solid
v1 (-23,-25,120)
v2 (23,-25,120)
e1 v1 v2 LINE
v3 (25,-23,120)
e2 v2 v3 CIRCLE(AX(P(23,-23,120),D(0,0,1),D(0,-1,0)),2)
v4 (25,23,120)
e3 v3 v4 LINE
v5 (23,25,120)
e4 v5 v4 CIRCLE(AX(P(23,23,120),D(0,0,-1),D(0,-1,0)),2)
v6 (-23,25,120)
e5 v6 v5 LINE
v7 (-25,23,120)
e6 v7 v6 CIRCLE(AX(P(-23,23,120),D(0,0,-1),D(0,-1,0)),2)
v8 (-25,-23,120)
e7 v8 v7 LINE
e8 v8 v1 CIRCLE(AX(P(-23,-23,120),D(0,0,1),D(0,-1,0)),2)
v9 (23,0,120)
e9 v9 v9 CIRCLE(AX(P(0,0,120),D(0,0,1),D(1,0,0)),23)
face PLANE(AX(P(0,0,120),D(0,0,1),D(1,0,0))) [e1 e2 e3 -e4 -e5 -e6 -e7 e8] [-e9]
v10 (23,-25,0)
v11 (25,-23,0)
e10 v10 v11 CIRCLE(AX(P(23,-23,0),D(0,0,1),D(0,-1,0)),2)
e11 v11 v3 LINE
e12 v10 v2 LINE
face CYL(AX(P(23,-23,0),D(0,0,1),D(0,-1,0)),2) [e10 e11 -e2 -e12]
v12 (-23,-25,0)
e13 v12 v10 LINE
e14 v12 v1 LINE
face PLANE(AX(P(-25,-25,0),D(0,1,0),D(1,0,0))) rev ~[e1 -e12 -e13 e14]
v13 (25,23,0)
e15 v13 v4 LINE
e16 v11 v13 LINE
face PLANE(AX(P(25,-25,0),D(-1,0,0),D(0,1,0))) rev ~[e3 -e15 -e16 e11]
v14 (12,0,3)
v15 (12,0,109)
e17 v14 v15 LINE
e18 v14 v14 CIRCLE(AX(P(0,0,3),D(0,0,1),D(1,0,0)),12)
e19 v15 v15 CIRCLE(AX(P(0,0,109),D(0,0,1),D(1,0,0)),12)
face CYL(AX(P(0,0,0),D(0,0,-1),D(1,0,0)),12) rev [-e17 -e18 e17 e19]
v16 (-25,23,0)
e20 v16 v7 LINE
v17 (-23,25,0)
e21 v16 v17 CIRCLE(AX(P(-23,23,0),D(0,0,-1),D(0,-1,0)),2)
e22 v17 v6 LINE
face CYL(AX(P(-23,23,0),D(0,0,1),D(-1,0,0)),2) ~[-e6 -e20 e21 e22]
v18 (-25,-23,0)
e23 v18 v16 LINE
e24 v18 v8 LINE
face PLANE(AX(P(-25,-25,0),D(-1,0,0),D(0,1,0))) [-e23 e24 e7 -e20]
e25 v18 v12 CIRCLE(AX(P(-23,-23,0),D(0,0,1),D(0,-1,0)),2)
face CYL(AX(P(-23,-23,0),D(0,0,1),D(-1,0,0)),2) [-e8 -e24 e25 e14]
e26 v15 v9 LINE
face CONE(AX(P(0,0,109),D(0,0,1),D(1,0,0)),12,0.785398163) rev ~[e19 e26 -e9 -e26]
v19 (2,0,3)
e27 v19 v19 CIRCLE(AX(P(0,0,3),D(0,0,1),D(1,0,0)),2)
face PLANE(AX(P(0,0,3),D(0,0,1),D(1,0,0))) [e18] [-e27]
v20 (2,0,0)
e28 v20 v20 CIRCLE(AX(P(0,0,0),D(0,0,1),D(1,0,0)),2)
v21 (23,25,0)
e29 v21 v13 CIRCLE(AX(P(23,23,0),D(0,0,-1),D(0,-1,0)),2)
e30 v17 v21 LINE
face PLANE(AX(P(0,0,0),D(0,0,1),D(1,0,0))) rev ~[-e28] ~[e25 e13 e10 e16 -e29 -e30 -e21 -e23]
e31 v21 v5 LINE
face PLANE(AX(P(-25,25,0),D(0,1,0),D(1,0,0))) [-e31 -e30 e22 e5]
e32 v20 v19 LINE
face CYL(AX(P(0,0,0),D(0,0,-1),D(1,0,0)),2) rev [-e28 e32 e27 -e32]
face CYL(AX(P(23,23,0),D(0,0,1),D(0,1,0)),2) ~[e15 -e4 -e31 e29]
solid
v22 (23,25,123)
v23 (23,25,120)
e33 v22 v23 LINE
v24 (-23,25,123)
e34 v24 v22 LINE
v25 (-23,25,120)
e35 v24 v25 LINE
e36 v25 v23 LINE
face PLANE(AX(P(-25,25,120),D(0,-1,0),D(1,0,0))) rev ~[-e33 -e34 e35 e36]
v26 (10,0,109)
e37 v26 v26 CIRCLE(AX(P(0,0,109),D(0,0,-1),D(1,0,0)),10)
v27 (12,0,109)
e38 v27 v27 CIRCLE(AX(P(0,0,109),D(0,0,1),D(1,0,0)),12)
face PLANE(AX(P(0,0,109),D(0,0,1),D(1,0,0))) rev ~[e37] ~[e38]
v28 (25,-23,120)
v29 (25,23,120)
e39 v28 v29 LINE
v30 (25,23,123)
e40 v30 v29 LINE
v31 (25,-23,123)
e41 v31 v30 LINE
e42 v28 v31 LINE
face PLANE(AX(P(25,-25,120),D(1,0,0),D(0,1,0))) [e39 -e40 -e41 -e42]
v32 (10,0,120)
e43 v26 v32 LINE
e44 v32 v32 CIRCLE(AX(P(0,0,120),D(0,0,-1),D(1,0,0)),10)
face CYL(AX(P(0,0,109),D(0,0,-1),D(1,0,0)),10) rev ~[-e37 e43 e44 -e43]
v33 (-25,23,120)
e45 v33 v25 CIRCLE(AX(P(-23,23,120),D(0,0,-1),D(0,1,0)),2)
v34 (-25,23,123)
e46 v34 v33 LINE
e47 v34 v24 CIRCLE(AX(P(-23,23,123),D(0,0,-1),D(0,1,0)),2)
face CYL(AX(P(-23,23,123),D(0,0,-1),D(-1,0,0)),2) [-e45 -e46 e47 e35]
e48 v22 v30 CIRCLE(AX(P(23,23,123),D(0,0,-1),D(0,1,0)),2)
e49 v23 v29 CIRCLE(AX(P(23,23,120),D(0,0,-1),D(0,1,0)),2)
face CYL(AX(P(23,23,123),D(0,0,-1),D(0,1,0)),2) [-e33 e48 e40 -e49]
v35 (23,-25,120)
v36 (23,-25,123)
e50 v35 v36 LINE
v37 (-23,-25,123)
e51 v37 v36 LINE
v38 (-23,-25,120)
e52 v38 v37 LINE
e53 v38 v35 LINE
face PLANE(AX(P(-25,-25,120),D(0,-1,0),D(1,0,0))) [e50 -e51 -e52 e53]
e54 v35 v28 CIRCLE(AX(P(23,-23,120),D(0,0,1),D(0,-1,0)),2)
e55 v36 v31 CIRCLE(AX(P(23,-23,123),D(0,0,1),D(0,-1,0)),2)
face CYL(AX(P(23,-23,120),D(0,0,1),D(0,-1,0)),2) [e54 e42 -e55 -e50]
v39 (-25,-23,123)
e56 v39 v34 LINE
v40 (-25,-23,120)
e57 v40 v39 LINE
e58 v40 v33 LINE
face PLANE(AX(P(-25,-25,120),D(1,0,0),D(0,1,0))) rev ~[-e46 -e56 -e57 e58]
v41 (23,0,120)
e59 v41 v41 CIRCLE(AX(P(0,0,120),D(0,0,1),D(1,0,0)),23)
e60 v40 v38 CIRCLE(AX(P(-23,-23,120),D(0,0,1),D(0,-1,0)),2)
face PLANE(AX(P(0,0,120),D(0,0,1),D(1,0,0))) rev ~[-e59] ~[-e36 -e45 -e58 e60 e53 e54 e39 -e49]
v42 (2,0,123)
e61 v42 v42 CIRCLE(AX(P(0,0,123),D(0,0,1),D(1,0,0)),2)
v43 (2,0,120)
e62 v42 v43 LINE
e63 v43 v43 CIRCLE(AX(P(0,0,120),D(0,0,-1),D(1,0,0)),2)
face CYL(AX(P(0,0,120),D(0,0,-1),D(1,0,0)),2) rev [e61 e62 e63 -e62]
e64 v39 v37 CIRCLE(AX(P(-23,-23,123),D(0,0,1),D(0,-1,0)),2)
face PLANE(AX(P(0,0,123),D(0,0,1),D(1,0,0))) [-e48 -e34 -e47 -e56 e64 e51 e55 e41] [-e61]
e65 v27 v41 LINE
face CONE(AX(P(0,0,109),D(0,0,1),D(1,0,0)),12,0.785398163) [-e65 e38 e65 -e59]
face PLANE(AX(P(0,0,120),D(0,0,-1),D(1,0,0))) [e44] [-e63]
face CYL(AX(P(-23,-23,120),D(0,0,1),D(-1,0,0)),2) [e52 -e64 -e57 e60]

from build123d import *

# Parameters (mm, degrees)
F0_W          = 50
F0_H          = 50
F0_R          = 12
F1_DEPTH      = 120
F0_R_2        = 2
F2_DEPTH      = 3
F3_SIZE       = 11
F4_W          = 50
F4_H          = 50
F4_R          = 2
F5_DEPTH      = 3
F5_DEPTH_BACK = 11
F7_R          = 10
F8_DEPTH      = 11
F9_R          = 2
F9_2_R        = 2


# Not quite as in the source:
# - a feature names something its author has since deleted; it is built from what else it names


with BuildPart() as f1:
    # F0 (on Top) → F1 (new body)
    with BuildSketch(Plane.XY):
        Rectangle(F0_W, F0_H)
        Circle(F0_R, mode=Mode.SUBTRACT)
    extrude(amount=F1_DEPTH)

    # F0 (on Top) → F2 (join)
    with BuildSketch(Plane.XY):
        Circle(F0_R)
        Circle(F0_R_2, mode=Mode.SUBTRACT)
    extrude(amount=F2_DEPTH)

    # F3
    f3_edges = [f1.edges().sort_by_distance(p)[0] for p in [
        (-12, 0, 120),
    ]]
    chamfer(f3_edges, length=F3_SIZE)


with BuildPart() as f5:
    # F4 (on face) → F5 (new body, two sides)
    with BuildSketch(Plane.XY.offset(120)) as f5_sk:
        Rectangle(F4_W, F4_H)
        Circle(F4_R, mode=Mode.SUBTRACT)
    extrude(amount=F5_DEPTH)
    extrude(f5_sk.sketch, amount=-F5_DEPTH_BACK)

    # F6: cut F1
    add(f1.part, mode=Mode.SUBTRACT)

    # F7 (on face) → F8 (cut, through all)
    with BuildSketch(Plane(origin=(0, 0, 109), x_dir=(1, 0, 0), z_dir=(0, 0, -1))):
        Circle(F7_R)
    extrude(amount=-F8_DEPTH, mode=Mode.SUBTRACT)

    # F9#2
    f9_2_edges = [f5.edges().sort_by_distance(p)[0] for p in [
        (25, -25, 121.5),
        (25, 25, 121.5),
        (-25, 25, 121.5),
        (-25, -25, 121.5),
    ]]
    fillet(f9_2_edges, radius=F9_2_R)


with BuildPart() as f1_1:
    add(f1.part)

    # F9
    f9_edges = [f1_1.edges().sort_by_distance(p)[0] for p in [
        (25, -25, 60),
        (25, 25, 60),
        (-25, 25, 60),
        (-25, -25, 60),
    ]]
    fillet(f9_edges, radius=F9_R)


solid = Compound([f5.part, f1_1.part])
